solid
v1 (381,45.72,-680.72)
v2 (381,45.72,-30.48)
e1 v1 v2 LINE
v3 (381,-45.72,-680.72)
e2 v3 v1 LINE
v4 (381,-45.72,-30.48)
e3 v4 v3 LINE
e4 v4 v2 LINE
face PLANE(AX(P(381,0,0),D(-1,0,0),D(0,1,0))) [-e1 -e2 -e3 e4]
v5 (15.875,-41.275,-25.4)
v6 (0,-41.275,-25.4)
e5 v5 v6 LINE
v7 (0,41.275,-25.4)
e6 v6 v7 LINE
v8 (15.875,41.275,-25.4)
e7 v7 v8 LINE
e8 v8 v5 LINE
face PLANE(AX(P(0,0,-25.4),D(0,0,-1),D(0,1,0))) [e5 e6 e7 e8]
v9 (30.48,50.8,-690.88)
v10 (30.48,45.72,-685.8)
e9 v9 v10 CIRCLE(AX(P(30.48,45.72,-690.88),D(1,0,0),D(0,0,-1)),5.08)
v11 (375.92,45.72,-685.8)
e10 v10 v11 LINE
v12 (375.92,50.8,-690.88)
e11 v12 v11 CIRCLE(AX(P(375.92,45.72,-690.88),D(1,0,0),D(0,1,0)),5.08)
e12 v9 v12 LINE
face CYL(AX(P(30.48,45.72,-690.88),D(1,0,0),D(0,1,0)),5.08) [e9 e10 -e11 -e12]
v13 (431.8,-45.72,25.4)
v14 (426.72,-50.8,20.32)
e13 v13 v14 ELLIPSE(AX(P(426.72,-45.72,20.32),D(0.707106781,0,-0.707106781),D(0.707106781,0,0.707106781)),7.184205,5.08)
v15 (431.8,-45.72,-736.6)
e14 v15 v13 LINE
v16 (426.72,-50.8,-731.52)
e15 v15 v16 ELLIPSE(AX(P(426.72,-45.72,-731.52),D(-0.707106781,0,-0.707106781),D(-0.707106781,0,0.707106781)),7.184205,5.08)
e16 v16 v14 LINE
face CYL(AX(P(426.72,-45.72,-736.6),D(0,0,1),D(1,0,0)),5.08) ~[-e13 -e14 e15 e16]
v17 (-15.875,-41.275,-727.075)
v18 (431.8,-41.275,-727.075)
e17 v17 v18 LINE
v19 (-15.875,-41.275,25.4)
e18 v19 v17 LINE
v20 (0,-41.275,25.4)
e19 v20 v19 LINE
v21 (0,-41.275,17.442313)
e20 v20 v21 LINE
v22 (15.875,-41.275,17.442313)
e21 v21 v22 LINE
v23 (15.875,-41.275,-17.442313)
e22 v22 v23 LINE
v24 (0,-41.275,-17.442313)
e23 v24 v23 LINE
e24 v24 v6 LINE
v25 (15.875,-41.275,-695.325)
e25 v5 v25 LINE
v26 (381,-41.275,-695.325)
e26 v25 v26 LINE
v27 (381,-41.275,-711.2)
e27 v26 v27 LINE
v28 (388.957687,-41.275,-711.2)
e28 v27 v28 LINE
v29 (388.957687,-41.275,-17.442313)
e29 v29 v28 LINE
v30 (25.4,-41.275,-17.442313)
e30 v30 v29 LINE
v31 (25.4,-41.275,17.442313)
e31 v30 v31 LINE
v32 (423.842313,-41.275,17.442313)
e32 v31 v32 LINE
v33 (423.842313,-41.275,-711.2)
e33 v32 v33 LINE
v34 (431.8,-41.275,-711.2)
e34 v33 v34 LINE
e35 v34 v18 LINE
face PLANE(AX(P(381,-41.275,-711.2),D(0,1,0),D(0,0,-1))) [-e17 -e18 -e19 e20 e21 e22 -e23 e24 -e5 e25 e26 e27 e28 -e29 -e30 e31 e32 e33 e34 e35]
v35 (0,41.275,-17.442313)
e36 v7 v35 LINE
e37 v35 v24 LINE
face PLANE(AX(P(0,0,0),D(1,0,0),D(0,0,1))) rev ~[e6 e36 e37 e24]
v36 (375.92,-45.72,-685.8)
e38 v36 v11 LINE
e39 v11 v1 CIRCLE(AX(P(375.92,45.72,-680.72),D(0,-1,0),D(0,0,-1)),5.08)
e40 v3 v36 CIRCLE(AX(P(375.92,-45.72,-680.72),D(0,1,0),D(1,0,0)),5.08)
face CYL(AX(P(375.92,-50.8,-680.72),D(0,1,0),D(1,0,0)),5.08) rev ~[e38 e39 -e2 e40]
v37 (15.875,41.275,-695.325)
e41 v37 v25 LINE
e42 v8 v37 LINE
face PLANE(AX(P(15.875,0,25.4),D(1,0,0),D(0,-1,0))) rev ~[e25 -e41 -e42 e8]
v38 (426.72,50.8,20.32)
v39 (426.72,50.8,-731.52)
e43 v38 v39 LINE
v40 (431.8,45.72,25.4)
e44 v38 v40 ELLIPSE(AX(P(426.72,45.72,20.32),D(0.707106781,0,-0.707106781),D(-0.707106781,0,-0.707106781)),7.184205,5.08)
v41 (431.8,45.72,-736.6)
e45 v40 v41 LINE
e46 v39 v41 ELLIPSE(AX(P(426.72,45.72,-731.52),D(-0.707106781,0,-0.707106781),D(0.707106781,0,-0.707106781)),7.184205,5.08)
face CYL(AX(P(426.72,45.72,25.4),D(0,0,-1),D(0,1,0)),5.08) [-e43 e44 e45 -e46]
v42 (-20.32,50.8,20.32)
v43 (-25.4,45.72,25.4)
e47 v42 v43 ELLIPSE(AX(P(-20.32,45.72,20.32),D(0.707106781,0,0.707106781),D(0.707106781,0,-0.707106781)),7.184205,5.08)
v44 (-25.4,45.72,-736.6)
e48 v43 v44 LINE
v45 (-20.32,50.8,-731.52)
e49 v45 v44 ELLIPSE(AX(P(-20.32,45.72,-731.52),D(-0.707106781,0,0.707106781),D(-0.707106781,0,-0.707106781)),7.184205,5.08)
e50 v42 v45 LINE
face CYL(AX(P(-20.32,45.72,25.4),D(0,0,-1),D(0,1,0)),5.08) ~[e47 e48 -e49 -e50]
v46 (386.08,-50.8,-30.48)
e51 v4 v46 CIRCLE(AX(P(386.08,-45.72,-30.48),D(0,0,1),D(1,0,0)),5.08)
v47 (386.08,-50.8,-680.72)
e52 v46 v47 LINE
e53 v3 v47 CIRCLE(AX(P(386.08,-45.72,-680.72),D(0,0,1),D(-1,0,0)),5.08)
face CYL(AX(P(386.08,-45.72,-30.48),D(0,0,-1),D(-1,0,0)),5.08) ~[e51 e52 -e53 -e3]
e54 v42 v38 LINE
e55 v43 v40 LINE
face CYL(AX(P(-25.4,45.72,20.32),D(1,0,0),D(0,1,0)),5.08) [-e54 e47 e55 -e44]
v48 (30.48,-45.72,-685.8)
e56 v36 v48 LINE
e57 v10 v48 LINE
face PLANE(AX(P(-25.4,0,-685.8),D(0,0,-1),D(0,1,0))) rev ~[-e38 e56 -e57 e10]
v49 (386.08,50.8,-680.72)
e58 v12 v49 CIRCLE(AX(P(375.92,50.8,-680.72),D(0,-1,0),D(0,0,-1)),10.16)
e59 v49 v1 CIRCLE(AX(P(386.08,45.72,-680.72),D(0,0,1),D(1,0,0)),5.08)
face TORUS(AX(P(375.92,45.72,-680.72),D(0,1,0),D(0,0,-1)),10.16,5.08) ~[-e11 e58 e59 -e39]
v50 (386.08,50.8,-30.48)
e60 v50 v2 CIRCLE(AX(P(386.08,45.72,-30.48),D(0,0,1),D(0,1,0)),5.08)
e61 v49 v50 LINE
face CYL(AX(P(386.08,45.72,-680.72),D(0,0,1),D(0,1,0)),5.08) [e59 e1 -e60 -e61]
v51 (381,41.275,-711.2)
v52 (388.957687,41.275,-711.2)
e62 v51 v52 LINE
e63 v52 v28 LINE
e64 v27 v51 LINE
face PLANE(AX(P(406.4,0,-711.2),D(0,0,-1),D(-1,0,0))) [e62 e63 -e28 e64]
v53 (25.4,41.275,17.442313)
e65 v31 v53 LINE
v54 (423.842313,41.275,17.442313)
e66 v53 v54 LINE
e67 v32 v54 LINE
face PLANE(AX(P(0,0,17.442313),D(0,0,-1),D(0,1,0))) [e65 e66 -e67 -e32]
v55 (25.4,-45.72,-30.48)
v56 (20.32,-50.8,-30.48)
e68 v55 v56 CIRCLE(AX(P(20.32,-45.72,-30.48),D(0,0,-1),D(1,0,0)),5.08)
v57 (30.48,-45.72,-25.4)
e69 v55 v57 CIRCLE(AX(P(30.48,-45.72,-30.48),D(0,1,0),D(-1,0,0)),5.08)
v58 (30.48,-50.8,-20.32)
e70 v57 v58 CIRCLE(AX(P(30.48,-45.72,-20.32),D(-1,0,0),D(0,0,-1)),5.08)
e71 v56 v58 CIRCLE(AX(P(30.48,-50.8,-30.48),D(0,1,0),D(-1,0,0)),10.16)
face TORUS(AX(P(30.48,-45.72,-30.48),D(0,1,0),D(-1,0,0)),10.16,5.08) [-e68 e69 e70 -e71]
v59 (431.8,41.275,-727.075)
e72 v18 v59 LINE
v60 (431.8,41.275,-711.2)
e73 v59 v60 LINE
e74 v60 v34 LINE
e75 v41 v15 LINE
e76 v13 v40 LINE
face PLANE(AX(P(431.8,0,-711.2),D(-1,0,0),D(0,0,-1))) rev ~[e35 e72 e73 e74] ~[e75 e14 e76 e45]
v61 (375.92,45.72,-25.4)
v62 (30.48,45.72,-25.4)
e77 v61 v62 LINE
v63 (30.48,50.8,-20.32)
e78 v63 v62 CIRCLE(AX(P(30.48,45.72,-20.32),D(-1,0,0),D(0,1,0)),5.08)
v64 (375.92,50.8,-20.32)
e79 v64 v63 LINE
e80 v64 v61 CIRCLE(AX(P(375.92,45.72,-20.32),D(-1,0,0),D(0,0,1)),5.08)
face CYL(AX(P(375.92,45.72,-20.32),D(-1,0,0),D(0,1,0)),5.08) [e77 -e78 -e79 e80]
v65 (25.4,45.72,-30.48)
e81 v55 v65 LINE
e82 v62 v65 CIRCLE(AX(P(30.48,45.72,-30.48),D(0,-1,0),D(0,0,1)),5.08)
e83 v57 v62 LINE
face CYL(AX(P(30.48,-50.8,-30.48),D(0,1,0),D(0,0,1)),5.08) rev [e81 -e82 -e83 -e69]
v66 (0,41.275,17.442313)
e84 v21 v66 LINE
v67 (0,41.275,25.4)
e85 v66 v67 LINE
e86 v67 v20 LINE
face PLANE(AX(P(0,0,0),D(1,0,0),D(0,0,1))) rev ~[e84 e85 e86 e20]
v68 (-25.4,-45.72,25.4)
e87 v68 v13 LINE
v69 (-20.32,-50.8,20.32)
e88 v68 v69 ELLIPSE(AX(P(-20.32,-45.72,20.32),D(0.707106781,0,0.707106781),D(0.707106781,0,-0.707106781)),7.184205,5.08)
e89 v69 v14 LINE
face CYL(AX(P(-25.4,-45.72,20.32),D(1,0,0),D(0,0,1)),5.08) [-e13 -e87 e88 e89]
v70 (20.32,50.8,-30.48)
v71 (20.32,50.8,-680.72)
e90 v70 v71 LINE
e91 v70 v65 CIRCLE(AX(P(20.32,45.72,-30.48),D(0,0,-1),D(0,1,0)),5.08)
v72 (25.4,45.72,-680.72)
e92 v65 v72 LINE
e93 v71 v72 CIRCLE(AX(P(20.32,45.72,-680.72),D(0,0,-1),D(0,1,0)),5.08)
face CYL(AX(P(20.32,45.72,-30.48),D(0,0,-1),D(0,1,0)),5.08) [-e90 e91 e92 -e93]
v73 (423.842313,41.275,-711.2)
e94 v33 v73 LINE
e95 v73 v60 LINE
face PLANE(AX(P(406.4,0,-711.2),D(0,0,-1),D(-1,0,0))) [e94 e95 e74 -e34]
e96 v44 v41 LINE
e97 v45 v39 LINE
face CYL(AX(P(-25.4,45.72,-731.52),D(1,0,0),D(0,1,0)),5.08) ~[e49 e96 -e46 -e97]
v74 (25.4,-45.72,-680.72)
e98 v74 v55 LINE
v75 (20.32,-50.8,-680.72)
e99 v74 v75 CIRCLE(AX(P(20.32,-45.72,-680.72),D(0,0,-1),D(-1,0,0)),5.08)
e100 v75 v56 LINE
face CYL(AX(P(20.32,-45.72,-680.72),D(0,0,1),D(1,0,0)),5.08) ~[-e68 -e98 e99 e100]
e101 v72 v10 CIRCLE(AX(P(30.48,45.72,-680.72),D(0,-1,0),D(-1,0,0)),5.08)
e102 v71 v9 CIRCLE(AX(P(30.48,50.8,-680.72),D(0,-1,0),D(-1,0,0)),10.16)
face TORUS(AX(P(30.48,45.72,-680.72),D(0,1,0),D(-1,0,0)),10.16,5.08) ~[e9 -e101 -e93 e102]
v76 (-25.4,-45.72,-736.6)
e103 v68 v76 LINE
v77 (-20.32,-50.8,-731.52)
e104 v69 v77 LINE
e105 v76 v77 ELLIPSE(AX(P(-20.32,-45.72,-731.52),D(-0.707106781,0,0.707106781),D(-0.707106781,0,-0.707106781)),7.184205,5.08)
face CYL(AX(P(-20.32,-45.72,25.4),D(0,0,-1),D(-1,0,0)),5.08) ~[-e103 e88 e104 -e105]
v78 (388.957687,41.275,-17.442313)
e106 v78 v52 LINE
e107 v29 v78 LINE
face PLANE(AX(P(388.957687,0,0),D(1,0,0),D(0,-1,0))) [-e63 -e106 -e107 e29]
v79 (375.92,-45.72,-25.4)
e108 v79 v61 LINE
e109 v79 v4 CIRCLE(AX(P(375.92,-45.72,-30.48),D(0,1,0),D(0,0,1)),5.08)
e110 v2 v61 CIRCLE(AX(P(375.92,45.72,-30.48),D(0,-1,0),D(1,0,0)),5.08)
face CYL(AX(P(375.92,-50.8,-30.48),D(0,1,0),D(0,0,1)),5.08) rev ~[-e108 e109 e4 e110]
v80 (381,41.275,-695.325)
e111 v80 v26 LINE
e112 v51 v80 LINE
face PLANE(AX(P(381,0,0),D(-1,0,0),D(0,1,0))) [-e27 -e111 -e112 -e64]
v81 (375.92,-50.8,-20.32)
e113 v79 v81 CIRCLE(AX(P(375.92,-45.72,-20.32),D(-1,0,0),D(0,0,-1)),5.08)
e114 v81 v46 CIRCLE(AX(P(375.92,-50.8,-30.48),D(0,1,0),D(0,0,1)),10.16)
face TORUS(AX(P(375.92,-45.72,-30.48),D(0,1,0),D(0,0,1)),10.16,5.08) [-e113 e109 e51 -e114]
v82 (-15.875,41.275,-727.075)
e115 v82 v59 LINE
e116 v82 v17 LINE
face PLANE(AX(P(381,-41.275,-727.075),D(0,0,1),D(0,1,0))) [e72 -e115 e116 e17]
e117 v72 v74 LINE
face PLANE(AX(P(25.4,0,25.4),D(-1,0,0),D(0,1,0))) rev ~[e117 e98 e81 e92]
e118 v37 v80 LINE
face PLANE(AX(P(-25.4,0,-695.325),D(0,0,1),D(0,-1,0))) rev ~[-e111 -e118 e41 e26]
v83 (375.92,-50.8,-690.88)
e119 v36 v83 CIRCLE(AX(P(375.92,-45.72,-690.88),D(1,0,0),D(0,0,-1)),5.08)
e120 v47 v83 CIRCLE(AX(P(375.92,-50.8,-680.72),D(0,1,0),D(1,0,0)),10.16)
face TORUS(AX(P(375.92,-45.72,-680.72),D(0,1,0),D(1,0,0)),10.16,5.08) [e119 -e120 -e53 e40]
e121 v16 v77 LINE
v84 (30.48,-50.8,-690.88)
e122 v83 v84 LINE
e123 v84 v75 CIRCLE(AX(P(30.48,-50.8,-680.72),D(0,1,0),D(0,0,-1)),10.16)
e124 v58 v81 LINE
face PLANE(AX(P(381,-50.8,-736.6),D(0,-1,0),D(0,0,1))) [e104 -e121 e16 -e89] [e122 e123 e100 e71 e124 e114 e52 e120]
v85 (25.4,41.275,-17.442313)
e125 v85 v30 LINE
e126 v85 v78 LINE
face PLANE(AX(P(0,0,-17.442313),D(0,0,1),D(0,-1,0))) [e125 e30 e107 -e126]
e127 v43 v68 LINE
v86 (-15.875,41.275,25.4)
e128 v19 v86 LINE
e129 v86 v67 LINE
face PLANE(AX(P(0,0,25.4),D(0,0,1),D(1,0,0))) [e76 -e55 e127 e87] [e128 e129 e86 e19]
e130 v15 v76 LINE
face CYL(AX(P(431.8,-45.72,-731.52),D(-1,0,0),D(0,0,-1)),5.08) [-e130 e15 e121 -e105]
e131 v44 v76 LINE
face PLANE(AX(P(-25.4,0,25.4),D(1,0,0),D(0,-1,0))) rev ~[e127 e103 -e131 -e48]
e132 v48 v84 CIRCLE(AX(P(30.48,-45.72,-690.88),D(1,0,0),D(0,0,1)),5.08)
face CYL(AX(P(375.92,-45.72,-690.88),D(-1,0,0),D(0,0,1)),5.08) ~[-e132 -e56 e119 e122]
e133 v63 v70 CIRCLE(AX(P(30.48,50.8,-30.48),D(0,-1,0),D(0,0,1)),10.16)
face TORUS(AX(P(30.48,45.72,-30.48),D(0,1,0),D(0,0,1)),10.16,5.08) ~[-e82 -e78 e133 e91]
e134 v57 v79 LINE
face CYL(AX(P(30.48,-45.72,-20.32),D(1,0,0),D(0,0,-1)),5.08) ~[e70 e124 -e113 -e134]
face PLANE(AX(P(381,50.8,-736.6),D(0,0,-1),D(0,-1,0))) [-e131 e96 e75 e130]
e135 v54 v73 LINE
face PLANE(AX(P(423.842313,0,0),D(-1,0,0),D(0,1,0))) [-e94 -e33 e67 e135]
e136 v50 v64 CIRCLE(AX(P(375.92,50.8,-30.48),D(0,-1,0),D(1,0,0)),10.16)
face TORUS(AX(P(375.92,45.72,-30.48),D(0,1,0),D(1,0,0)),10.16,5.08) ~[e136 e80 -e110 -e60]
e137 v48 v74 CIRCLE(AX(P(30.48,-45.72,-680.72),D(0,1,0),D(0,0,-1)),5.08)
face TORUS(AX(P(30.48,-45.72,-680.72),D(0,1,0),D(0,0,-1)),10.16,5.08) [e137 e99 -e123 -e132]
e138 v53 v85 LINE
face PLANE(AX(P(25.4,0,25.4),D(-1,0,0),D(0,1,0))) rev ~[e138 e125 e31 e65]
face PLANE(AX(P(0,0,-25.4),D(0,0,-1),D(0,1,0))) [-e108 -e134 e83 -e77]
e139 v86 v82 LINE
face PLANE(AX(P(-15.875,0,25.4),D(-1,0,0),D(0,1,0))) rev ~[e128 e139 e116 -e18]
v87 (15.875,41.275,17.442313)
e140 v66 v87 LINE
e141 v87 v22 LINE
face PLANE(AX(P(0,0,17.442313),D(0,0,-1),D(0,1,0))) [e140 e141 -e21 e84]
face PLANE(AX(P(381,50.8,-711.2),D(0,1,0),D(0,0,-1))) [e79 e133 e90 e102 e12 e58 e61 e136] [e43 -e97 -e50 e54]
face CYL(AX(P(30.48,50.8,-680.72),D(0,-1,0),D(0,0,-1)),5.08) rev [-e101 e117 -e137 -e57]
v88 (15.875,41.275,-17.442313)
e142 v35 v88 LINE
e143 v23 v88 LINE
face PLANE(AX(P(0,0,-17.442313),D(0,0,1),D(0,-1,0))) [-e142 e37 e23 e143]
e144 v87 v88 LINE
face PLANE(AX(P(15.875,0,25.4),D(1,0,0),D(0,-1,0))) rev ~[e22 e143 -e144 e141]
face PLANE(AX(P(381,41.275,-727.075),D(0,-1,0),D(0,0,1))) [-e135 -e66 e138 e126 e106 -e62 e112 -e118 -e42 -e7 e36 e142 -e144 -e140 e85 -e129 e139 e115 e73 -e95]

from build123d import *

# Parameters (mm, degrees)
F1_W     = 101.6
F1_H     = 50.8
F1_W_2   = 82.55
F1_H_2   = 34.8846255165
F4_W     = 50.8
F4_H     = 101.6
F4_W_2   = 31.75
F4_H_2   = 82.55
F6_DEPTH = 50.8
F7_F1_R  = 5.08
F7_F2_R  = 5.08
F8_R     = 5.08


with BuildPart() as f2:
    # F2: sweep along a path in F0
    with BuildLine(Plane.XZ) as f2_path:
        Line((0, 0), (406.4, 0))
        Line((406.4, 0), (406.4, -711.2))
    # F1 (on Right) → F2 (sweep)
    with BuildSketch(Plane.YZ):
        Rectangle(F1_W, F1_H)
        Rectangle(F1_W_2, F1_H_2, mode=Mode.SUBTRACT)
    sweep(path=f2_path.line, transition=Transition.RIGHT)

    # F5: sweep along a path in F0
    with BuildLine(Plane.XZ) as f5_path:
        Line((0, 0), (0, -711.2))
        Line((0, -711.2), (406.4, -711.2))
    # F4 (on offset) → F5 (sweep)
    with BuildSketch(Plane.XY.offset(25.4)):
        Rectangle(F4_W, F4_H)
        Rectangle(F4_W_2, F4_H_2, mode=Mode.SUBTRACT)
    sweep(path=f5_path.line, transition=Transition.RIGHT)

    # F6 (add): a face of the model
    f6_faces = [f2.faces().sort_by_distance(p)[0] for p in [
        (381, 0, -728.8136904762),
    ]]
    extrude(f6_faces, amount=F6_DEPTH)

    # F7: fillet of radius 5.08 on 6 edges, made by hand

    # F7_f1
    f7_f1_edges = [f2.edges().sort_by_distance(p)[0] for p in [
        (381, 0, -685.8),
        (25.4, 0, -685.8),
        (25.4, 0, -25.4),
        (381, 0, -25.4),
    ]]
    fillet(f7_f1_edges, radius=F7_F1_R)

    # F7_f2
    f7_f2_edges = [f2.edges().sort_by_distance(p)[0] for p in [
        (203.2, -50.8, -25.4),
        (25.4, 50.8, -355.6),
        (26.8878975516, 50.8, -26.8878975516),
        (26.8878975516, 50.8, -684.3121024484),
        (26.8878975516, -50.8, -26.8878975516),
        (379.5121024484, -50.8, -26.8878975516),
    ]]
    fillet(f7_f2_edges, radius=F7_F2_R)

    # F8
    f8_edges = [f2.edges().sort_by_distance(p)[0] for p in [
        (203.2, -50.8, 25.4),
        (-25.4, -50.8, -355.6),
        (431.8, -50.8, -355.6),
        (203.2, -50.8, -736.6),
        (-25.4, 50.8, -355.6),
        (203.2, 50.8, -736.6),
        (431.8, 50.8, -355.6),
        (203.2, 50.8, 25.4),
    ]]
    fillet(f8_edges, radius=F8_R)


solid = f2.part
